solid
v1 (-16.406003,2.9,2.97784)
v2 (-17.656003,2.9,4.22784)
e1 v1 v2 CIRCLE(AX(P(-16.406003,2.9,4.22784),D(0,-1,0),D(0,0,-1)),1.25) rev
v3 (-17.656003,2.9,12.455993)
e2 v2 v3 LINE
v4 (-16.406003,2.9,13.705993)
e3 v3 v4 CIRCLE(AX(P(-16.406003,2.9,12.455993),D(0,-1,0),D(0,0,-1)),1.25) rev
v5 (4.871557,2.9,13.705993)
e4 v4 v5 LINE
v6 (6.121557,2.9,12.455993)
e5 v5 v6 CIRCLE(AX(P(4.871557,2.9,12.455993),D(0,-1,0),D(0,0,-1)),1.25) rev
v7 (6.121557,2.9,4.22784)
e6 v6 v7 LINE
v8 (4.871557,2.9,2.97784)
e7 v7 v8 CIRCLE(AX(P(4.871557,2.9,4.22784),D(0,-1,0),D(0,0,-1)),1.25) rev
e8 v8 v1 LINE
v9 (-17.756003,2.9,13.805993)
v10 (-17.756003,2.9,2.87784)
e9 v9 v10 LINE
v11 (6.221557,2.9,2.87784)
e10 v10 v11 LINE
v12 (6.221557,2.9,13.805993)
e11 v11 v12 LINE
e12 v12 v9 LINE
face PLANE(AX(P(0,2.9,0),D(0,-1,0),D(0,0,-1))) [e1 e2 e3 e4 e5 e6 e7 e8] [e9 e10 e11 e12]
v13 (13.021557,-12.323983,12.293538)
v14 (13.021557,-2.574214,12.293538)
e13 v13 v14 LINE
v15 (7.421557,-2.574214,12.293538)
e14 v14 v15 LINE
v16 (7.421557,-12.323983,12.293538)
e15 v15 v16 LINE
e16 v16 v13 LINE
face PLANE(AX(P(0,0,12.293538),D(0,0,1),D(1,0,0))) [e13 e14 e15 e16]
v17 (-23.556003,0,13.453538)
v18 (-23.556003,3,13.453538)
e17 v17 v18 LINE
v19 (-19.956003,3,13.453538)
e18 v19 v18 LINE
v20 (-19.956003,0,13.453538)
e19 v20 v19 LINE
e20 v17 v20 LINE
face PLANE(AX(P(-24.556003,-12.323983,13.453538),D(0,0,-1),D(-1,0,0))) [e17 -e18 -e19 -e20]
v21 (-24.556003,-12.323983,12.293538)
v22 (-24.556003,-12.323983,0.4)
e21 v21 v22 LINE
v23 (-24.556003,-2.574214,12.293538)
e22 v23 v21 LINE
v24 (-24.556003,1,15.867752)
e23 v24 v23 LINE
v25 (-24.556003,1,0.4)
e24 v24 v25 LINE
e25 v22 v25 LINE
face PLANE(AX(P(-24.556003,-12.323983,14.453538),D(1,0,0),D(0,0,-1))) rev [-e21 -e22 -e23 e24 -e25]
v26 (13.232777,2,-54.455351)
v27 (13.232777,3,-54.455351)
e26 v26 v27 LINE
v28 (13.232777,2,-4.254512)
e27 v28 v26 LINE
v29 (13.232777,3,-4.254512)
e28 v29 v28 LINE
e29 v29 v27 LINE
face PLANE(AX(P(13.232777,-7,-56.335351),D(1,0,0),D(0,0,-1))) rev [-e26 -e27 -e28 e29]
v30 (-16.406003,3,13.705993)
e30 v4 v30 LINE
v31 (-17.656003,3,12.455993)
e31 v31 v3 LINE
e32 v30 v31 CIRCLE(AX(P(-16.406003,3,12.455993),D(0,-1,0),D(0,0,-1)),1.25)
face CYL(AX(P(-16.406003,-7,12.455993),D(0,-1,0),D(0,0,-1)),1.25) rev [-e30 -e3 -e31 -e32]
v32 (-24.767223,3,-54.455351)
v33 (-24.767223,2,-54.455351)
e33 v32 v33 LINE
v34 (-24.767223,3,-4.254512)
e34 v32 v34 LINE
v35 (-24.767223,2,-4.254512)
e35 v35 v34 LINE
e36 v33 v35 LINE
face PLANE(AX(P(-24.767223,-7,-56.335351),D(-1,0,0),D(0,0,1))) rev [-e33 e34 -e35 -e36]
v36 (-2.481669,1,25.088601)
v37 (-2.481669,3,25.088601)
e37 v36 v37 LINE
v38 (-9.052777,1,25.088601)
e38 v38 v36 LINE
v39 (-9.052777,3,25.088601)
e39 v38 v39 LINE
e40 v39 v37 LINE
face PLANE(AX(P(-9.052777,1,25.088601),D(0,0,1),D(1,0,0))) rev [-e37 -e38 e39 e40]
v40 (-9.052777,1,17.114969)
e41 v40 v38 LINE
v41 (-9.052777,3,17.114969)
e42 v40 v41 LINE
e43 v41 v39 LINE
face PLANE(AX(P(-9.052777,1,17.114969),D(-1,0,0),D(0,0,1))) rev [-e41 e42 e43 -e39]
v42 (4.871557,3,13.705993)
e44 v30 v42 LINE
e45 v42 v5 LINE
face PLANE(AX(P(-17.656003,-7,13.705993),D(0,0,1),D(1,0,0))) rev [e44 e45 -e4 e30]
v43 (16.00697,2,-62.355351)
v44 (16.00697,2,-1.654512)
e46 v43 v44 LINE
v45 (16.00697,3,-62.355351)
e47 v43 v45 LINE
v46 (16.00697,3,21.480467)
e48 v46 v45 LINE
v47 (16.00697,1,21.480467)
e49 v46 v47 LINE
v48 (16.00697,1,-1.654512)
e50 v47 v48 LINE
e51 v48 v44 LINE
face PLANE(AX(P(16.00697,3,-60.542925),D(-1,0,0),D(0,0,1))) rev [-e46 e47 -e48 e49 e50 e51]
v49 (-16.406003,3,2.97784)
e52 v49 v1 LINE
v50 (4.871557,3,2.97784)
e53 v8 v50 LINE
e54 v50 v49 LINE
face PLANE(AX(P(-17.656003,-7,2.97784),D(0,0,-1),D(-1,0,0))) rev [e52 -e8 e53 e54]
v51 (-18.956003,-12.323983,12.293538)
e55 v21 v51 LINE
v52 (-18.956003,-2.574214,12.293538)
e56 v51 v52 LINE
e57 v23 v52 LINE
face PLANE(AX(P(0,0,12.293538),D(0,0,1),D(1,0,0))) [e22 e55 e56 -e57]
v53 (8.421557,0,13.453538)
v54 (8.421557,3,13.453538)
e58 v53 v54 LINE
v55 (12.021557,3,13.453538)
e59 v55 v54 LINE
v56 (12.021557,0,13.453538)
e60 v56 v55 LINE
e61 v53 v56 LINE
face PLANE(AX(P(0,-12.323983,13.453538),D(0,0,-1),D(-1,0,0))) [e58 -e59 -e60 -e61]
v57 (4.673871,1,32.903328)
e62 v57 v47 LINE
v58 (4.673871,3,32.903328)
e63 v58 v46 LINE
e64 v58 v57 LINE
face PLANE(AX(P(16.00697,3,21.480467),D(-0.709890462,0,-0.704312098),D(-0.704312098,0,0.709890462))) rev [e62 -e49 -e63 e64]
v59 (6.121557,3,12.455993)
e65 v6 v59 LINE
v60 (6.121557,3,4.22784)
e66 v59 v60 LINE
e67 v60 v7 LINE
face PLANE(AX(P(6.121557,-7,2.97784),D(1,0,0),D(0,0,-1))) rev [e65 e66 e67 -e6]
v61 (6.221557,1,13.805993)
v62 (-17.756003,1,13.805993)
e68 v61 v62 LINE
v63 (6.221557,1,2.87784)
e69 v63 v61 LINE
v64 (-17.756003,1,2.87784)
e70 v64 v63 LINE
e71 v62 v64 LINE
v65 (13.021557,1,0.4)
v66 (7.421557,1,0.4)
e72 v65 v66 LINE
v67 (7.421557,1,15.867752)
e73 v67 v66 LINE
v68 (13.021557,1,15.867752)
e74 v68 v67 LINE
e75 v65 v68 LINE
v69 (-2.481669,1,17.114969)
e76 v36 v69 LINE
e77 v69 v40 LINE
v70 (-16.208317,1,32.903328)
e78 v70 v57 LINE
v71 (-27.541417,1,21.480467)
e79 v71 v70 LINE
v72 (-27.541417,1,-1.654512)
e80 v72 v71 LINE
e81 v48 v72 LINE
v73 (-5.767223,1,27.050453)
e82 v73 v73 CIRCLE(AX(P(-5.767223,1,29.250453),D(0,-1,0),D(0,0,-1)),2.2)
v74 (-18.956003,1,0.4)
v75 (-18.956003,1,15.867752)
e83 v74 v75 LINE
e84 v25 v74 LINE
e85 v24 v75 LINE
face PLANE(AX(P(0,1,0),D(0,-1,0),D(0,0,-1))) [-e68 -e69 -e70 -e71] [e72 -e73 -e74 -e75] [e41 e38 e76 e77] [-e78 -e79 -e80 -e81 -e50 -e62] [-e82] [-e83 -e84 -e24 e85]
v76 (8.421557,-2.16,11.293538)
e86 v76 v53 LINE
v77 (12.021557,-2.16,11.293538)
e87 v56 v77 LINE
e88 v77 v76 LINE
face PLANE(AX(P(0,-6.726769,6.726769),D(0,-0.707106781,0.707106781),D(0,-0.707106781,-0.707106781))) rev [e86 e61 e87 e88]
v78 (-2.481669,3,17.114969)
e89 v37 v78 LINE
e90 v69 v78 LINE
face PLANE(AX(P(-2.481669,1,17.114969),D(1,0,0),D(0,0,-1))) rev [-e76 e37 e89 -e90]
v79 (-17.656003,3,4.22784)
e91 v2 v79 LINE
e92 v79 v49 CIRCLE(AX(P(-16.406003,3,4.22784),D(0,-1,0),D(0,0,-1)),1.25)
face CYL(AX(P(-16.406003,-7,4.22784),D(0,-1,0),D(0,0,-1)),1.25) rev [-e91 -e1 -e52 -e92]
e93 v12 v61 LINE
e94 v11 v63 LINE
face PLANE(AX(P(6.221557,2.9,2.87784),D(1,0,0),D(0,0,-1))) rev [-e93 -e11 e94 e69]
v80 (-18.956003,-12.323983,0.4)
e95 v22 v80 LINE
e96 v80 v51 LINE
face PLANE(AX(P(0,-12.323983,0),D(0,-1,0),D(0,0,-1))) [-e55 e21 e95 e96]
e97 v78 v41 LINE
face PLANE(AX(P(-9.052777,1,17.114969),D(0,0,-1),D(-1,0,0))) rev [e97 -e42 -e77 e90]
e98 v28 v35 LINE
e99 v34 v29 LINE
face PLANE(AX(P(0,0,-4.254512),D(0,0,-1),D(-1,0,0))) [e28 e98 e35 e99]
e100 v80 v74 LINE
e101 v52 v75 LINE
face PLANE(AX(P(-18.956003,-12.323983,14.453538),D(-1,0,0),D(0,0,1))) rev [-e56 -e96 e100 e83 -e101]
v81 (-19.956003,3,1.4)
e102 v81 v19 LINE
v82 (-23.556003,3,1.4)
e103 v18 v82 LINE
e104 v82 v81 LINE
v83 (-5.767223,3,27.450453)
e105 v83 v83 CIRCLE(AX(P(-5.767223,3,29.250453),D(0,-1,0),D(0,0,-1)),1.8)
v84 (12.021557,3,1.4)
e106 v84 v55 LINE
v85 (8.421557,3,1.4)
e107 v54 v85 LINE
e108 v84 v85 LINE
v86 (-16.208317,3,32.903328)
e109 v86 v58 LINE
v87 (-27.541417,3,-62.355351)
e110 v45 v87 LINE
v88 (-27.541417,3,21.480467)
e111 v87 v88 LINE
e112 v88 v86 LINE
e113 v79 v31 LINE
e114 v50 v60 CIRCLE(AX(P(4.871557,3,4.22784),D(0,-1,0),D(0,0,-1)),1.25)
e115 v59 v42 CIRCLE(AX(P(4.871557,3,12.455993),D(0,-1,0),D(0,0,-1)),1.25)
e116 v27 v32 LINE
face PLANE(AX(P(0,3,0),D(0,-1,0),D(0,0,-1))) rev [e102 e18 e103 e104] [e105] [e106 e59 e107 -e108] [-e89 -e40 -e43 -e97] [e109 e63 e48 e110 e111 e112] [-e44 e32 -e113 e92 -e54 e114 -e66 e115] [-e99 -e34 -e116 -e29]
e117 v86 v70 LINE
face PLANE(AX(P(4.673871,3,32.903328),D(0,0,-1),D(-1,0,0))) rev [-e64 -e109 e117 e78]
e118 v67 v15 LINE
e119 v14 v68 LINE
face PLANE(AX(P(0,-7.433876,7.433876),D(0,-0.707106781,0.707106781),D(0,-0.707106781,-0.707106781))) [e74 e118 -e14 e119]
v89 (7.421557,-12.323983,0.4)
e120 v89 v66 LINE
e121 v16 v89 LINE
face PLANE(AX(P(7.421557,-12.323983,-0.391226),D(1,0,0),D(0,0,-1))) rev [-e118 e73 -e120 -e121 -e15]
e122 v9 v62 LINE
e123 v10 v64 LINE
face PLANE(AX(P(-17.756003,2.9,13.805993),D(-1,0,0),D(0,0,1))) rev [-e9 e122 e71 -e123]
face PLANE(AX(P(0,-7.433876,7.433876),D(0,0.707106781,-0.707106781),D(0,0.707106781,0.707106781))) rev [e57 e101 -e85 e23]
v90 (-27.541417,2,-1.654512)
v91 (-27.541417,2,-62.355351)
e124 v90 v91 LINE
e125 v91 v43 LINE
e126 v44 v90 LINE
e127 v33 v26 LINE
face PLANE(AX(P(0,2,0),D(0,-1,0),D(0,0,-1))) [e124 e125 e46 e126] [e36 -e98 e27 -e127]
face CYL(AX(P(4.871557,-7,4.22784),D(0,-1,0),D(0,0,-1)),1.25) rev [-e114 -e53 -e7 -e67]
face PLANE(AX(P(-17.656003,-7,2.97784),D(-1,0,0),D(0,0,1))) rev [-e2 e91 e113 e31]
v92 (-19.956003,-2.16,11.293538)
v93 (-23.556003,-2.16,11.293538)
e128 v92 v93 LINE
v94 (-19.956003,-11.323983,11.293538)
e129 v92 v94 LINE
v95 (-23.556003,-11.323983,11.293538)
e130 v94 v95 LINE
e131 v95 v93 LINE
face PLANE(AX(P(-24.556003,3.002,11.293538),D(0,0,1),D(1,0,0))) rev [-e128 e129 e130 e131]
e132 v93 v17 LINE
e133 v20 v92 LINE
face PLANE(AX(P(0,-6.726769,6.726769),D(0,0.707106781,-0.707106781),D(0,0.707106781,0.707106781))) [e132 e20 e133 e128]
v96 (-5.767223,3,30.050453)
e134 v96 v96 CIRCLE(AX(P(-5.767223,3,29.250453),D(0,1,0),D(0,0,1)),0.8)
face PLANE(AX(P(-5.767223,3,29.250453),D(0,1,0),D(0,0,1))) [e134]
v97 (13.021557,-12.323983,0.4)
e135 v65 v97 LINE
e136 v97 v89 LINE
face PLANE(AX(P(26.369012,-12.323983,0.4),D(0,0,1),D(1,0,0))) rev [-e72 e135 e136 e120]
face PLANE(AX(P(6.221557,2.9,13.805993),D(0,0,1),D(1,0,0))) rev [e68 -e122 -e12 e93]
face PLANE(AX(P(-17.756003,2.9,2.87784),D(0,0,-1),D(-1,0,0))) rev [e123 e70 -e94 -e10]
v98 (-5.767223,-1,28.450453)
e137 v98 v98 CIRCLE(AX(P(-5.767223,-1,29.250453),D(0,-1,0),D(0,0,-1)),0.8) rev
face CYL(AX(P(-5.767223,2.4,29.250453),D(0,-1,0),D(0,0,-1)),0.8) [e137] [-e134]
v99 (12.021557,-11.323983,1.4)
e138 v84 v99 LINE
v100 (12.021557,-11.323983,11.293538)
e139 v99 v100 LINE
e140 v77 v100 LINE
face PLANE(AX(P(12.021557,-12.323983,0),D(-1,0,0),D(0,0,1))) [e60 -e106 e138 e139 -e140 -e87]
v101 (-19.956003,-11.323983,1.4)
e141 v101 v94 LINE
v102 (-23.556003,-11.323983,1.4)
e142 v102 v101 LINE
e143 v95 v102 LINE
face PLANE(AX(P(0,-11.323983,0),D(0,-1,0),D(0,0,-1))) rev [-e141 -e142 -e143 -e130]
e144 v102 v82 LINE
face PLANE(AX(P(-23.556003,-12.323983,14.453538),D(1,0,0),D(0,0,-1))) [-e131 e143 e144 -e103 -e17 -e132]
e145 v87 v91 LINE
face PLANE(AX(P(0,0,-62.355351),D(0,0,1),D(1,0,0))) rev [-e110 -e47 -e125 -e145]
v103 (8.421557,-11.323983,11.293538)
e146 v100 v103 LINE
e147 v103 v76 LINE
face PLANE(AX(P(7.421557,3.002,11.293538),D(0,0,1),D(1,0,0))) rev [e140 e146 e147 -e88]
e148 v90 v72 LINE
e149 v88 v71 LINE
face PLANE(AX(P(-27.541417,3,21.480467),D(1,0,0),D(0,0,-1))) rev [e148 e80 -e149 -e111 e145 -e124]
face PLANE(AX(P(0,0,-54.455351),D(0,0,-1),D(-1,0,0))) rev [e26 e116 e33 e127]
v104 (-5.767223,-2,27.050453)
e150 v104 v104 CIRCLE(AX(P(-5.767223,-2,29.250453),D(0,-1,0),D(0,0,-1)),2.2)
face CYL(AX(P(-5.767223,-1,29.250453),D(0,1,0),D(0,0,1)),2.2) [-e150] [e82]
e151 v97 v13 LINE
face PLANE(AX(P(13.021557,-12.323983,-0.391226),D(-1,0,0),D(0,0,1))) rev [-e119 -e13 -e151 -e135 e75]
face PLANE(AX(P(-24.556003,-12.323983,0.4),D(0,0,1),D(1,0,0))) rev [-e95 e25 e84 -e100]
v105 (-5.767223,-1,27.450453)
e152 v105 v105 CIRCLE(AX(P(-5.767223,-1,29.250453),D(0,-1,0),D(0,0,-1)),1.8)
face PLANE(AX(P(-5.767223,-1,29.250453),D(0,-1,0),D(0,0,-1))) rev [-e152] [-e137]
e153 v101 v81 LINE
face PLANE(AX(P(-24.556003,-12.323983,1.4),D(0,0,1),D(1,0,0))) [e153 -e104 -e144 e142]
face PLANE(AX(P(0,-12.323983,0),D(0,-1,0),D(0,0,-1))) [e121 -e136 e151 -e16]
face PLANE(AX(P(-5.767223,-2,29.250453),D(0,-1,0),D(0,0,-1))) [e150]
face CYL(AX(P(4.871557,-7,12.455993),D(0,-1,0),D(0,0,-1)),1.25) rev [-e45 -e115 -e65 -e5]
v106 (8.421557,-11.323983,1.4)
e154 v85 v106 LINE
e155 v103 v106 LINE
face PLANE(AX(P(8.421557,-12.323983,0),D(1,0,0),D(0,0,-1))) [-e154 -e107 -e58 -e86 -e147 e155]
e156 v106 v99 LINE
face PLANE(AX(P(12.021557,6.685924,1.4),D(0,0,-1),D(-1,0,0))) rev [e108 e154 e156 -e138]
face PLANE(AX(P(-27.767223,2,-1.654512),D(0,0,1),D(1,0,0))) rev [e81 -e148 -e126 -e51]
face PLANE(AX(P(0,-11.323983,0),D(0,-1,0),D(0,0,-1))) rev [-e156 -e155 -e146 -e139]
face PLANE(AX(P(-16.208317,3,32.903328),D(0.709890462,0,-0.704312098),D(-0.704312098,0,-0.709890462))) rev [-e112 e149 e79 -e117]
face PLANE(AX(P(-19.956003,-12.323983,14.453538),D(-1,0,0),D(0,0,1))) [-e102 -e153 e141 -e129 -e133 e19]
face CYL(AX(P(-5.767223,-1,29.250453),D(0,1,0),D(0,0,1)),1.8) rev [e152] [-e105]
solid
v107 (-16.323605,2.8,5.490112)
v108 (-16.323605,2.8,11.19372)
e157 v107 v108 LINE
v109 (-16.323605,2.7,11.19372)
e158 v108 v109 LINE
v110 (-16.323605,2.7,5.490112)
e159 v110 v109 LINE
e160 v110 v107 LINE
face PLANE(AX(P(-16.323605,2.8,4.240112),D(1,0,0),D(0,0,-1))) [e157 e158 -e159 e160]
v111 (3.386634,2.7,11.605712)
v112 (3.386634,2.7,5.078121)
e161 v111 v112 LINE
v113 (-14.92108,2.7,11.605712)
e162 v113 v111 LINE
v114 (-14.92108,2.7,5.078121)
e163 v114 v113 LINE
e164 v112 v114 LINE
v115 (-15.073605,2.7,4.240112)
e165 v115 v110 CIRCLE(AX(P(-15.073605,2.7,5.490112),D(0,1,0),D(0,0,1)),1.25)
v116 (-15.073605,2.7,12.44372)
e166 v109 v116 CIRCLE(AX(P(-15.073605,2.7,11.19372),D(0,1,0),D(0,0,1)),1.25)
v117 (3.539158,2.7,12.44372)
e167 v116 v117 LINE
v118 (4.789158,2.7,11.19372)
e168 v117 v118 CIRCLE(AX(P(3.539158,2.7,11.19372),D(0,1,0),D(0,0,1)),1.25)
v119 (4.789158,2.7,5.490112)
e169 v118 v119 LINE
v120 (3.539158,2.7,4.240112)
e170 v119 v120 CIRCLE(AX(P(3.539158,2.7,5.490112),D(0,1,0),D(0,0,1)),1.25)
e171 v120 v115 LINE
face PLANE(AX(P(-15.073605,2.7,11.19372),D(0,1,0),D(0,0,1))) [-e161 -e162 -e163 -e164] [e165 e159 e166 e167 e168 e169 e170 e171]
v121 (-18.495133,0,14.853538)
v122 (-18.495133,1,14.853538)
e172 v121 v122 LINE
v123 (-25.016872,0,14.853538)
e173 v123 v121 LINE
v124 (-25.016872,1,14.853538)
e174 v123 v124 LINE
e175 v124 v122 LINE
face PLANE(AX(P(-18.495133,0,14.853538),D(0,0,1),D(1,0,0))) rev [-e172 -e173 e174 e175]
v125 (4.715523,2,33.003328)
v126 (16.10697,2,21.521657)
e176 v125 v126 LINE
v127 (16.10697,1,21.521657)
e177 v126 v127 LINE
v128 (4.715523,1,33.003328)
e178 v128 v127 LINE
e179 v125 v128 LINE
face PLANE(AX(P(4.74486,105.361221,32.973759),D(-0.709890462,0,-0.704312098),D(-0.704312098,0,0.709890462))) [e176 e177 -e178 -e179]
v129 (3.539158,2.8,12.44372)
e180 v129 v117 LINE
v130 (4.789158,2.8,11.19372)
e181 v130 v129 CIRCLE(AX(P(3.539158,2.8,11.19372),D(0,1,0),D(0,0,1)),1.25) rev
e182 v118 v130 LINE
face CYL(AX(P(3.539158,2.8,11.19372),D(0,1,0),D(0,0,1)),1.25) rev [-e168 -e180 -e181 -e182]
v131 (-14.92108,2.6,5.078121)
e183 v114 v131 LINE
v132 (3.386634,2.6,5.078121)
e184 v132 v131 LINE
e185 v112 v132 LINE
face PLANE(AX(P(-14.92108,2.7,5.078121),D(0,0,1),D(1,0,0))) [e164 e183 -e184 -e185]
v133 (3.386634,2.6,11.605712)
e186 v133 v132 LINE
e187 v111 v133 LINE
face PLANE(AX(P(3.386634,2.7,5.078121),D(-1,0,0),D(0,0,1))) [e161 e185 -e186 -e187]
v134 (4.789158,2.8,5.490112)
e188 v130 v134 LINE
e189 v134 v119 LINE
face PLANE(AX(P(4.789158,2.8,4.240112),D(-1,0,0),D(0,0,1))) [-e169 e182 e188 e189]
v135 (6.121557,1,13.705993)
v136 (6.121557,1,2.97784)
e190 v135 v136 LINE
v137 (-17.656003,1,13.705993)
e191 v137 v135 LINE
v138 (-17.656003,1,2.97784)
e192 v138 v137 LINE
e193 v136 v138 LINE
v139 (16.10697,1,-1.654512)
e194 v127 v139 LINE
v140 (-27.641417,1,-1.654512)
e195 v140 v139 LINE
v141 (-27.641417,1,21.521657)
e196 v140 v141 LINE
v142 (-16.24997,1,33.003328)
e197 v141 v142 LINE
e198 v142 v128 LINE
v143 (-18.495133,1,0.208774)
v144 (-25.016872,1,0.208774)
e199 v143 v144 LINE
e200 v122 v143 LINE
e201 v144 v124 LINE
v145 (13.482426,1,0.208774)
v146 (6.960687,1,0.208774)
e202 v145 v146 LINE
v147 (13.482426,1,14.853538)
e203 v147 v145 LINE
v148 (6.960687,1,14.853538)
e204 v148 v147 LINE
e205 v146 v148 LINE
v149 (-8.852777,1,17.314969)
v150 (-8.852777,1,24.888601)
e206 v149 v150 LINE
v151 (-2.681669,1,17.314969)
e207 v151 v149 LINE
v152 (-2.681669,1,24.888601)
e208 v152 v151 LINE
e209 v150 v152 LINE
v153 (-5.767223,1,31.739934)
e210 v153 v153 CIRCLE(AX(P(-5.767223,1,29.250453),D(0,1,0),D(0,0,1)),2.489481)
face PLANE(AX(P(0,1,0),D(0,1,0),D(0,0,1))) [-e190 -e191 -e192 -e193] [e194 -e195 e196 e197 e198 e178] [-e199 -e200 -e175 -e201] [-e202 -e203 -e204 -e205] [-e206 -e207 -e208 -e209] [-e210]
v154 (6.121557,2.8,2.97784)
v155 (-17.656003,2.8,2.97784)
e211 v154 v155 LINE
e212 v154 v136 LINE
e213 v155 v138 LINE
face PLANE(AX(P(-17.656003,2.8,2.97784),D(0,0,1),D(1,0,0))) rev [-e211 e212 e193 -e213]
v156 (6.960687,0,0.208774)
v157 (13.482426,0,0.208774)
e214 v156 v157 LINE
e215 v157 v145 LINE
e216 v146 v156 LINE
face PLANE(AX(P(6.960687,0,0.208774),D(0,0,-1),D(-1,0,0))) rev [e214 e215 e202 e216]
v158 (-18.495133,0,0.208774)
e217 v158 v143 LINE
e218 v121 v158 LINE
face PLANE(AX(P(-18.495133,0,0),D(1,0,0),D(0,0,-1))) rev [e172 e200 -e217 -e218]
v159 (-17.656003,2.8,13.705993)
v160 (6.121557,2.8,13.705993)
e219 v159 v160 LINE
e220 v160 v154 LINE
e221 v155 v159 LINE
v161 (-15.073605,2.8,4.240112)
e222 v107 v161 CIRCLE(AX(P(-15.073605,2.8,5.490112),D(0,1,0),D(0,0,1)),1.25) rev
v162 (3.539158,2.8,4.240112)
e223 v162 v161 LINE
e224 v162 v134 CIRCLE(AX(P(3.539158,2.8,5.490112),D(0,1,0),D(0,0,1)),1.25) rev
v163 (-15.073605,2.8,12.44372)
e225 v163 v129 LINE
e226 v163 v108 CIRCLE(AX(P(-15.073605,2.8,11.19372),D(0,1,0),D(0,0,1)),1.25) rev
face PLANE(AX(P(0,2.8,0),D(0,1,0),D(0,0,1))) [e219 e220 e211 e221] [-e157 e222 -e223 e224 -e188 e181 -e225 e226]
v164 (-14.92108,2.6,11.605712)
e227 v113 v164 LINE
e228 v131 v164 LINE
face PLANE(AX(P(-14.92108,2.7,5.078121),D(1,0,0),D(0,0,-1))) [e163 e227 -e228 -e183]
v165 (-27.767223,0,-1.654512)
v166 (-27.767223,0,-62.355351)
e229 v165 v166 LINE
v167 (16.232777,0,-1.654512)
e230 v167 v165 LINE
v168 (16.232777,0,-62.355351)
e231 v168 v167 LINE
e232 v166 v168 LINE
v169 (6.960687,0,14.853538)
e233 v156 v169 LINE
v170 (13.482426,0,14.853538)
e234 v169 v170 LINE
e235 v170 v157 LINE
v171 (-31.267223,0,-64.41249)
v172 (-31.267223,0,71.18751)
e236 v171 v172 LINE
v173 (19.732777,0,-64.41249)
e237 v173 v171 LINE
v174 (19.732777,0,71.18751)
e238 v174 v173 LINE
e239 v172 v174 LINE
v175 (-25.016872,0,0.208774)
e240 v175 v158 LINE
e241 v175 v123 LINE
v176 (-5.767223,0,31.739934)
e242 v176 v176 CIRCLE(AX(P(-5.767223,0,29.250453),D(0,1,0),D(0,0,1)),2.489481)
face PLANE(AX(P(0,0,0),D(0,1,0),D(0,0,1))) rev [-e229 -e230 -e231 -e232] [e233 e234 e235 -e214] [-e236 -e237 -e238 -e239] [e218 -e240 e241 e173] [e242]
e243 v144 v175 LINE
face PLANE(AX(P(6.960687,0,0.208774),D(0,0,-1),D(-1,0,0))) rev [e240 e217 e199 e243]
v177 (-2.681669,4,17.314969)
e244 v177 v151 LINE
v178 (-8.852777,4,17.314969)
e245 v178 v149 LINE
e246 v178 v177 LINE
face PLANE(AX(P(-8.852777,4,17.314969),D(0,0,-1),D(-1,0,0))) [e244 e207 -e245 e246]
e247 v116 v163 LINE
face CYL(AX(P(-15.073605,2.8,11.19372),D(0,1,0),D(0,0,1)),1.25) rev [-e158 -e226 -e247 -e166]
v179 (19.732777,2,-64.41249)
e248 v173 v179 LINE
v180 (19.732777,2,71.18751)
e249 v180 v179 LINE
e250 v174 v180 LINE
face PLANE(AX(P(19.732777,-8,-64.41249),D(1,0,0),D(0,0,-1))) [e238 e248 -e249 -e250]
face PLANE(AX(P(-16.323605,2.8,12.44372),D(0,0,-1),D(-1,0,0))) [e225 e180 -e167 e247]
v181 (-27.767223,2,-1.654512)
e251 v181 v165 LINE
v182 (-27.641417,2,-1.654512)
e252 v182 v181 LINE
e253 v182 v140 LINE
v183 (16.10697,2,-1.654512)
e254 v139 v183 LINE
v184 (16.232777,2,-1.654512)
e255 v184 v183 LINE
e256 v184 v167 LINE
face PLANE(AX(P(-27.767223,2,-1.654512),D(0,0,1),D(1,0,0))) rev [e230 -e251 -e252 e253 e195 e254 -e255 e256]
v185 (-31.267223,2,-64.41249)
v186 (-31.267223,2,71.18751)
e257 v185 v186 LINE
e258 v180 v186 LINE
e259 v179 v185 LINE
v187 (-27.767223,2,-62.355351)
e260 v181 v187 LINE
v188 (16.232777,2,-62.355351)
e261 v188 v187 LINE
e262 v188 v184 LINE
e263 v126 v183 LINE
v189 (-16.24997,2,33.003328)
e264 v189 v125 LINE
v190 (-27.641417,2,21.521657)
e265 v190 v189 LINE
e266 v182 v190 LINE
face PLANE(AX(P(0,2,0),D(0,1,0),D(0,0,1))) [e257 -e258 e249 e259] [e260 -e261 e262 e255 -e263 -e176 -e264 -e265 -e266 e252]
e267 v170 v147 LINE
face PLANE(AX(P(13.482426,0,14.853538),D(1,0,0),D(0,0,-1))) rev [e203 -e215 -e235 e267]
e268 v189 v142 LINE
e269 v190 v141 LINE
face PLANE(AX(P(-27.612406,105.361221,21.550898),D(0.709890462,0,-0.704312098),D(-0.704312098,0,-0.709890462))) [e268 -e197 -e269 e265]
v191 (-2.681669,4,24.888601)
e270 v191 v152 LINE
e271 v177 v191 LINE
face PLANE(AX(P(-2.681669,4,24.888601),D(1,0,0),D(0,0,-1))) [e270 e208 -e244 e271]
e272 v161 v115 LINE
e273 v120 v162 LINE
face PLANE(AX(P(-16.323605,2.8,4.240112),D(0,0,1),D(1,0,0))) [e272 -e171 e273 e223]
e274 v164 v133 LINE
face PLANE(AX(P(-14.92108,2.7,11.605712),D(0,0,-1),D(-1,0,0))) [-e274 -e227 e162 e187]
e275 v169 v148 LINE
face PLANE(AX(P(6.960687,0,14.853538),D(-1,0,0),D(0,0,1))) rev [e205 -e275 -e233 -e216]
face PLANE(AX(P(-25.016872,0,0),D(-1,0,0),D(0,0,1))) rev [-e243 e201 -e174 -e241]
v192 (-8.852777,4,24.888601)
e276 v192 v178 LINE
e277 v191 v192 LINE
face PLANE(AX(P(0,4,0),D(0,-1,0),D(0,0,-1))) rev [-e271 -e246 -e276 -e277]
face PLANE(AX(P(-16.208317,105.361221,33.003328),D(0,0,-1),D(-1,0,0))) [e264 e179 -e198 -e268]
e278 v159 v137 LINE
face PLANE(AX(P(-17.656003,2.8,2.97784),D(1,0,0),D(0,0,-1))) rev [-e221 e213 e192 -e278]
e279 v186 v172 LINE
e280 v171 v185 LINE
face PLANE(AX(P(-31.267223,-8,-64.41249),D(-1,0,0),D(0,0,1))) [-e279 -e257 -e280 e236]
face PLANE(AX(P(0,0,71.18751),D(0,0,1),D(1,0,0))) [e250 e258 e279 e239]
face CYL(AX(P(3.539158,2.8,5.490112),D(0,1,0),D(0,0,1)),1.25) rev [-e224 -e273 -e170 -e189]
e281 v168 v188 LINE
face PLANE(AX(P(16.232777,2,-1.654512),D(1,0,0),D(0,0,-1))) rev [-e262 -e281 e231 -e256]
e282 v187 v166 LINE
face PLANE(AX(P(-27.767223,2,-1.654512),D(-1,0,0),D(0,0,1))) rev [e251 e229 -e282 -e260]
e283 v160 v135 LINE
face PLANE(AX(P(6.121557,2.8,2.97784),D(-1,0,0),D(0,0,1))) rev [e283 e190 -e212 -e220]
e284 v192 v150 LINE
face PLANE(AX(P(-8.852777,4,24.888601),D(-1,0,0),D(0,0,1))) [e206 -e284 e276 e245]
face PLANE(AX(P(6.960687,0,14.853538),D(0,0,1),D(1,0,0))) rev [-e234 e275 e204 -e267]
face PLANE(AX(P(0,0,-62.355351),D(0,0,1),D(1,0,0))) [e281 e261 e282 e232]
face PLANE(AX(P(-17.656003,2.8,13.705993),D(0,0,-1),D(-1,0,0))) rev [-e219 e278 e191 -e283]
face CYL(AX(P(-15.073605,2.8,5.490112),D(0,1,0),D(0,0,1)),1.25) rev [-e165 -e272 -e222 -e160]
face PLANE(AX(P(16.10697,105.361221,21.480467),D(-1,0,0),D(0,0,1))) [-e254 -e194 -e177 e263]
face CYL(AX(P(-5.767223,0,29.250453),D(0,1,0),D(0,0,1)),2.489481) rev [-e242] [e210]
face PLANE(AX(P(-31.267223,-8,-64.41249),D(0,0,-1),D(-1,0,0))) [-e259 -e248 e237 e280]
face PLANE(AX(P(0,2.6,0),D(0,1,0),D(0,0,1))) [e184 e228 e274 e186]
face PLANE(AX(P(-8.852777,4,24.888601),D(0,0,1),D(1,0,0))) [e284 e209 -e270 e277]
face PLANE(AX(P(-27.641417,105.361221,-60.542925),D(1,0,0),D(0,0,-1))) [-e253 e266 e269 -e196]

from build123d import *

# Parameters (mm, degrees)
SKETCH1_W                   = 51.332398317
SKETCH1_H                   = 136.325385694
BOSS_EXTRUDE1_DEPTH         = 2
CUT_EXTRUDE1_DEPTH          = 1
SKETCH3_W                   = 26.718092566
SKETCH3_H                   = 51.160838605
CUT_EXTRUDE2_DEPTH          = 1
SKETCH4_W                   = 20.659186536
SKETCH4_H                   = 13.604488078
BOSS_EXTRUDE2_DEPTH         = 1
SKETCH5_W                   = 6.521739131
SKETCH5_H                   = 14.853538096
SKETCH5_W_2                 = 6.52173913
SKETCH5_H_2                 = 15.644764374
CUT_EXTRUDE3_DEPTH          = 1
SKETCH6_W                   = 6.171107994
SKETCH6_H                   = 7.573632539
CUT_EXTRUDE4_DEPTH          = 1
SKETCH7_R                   = 2.489481066
CUT_EXTRUDE5_DEPTH          = 1
BOSS_EXTRUDE3_DEPTH         = 1
SKETCH10_W                  = 6.171107994
SKETCH10_H                  = 7.573632539
BOSS_EXTRUDE4_DEPTH         = 4
BOSS_EXTRUDE5_DEPTH         = 2
SKETCH12_W                  = 6.571107994
SKETCH12_H                  = 7.973632539
CUT_EXTRUDE6_DEPTH          = 2
SKETCH13_R                  = 1.8
SKETCH13_W                  = 26.718092566
SKETCH13_H                  = 51.160838605
CUT_EXTRUDE9_DEPTH          = 2
SKETCH14_R                  = 2.2
SKETCH14_R_2                = 1.8
BOSS_EXTRUDE11_DEPTH        = 2
SKETCH17_R                  = 2.2
BOSS_EXTRUDE12_DEPTH        = 1
SKETCH18_R                  = 0.8
BOSS_EXTRUDE15_DEPTH        = 3.4
EXTRUDE_THIN3_OUTLINE_W     = 5.6
EXTRUDE_THIN3_OUTLINE_H     = 14.844764374
EXTRUDE_THIN3_OUTLINE_W_2   = 3.6
EXTRUDE_THIN3_OUTLINE_H_2   = 12.844764374
EXTRUDE_THIN3_DEPTH         = 13.32398317
EXTRUDE_THIN3_2_OUTLINE_W   = 5.6
EXTRUDE_THIN3_2_OUTLINE_H   = 14.053538096
EXTRUDE_THIN3_2_OUTLINE_W_2 = 3.6
EXTRUDE_THIN3_2_OUTLINE_H_2 = 12.053538096
EXTRUDE_THIN3_2_DEPTH       = 13.32398317
SKETCH26_W                  = 3.6
SKETCH26_H                  = 12.053538096
SKETCH26_H_2                = 12.844764374
CUT_EXTRUDE12_DEPTH         = 13.32398317
SKETCH27_W                  = 5.6
SKETCH27_H                  = 14.053538096
BOSS_EXTRUDE18_DEPTH        = 1
SKETCH27_W_2                = 5.570395019
SKETCH27_H_2                = 14.844764374
BOSS_EXTRUDE18_2_DEPTH      = 1
SKETCH28_W                  = 20.659186536
SKETCH28_H                  = 13.604488078
CUT_EXTRUDE13_DEPTH         = 1
SKETCH29_W                  = 23.777559608
SKETCH29_H                  = 10.728152402
CUT_EXTRUDE15_DEPTH         = 10
SKETCH30_W                  = 23.777559608
SKETCH30_H                  = 10.728152402
SKETCH30_W_2                = 21.112762974
SKETCH30_H_2                = 8.203608222
BOSS_EXTRUDE20_DEPTH        = 1.8
SKETCH31_W                  = 21.112762974
SKETCH31_H                  = 8.203608222
BOSS_EXTRUDE21_DEPTH        = 1.6
SKETCH35_W                  = 23.977559608
SKETCH35_H                  = 10.928152402
CUT_EXTRUDE21_DEPTH         = 1.9
FILLET2_R                   = 1.25
FILLET3_R                   = 1.25
SKETCH37_W                  = 18.307713885
SKETCH37_H                  = 6.527591392
CUT_EXTRUDE22_DEPTH         = 0.1
SKETCH41_W                  = 18.307713885
SKETCH41_H                  = 6.527591392
BOSS_EXTRUDE27_DEPTH        = 0.1
SKETCH43_W                  = 18.307713885
SKETCH43_H                  = 6.527591392
BOSS_EXTRUDE28_DEPTH        = 0.1
CUT_EXTRUDE24_DEPTH         = 40.1
SKETCH51_W                  = 5.6
SKETCH51_H                  = 4.468914857
BOSS_EXTRUDE29_DEPTH        = 1
BOSS_EXTRUDE29_2_DEPTH      = 1
SKETCH52_W                  = 5.6
SKETCH52_H                  = 1
BOSS_EXTRUDE30_DEPTH        = 2.5
BOSS_EXTRUDE30_2_DEPTH      = 2.5
SKETCH53_W                  = 5.6
SKETCH53_H                  = 1
BOSS_EXTRUDE31_DEPTH        = 1
BOSS_EXTRUDE32_START        = 7.421556697
BOSS_EXTRUDE32_DEPTH        = 5.6
BOSS_EXTRUDE32_START_2      = -24.556002911
BOSS_EXTRUDE32_2_DEPTH      = 5.6
SKETCH55_W                  = 3.6
SKETCH55_H                  = 0.791226278
BOSS_EXTRUDE33_DEPTH        = 14.323983
SKETCH56_W                  = 0.791226278
SKETCH56_H                  = 13.32398317
CUT_EXTRUDE25_DEPTH         = 5.6
CUT_EXTRUDE_THIN1_DEPTH     = 1
SKETCH59_W                  = 71.33
SKETCH59_H                  = 156.33
SKETCH59_W_2                = 51.33
SKETCH59_H_2                = 136.33
CUT_EXTRUDE_THIN2_DEPTH     = 10
SKETCH60_W                  = 71
SKETCH60_H                  = 156
SKETCH60_W_2                = 51
SKETCH60_H_2                = 136
CUT_EXTRUDE_THIN3_DEPTH     = 10
SKETCH61_W                  = 51
SKETCH61_H                  = 2
CUT_EXTRUDE26_DEPTH         = 0.4
SKETCH62_W                  = 38
SKETCH62_H                  = 51.160838605
CUT_EXTRUDE28_DEPTH         = 10
SKETCH64_W                  = 38
SKETCH64_H                  = 0.08
BOSS_EXTRUDE35_DEPTH        = 2
SKETCH65_W                  = 38
SKETCH65_H                  = 0.08
BOSS_EXTRUDE37_DEPTH        = 1
SKETCH67_W                  = 44
SKETCH67_H                  = 61.400838605
CUT_EXTRUDE31_DEPTH         = 2
SKETCH69_W                  = 40.716981818
SKETCH69_H                  = 1
BOSS_EXTRUDE39_DEPTH        = 1.863286117
SKETCH70_W                  = 44
SKETCH70_H                  = 2
BOSS_EXTRUDE40_DEPTH        = 1
SKETCH71_W                  = 38
SKETCH71_H                  = 1
CUT_EXTRUDE32_DEPTH         = 1
SKETCH72_W                  = 38
SKETCH72_H                  = 1
BOSS_EXTRUDE41_DEPTH        = 1.8
SKETCH73_W                  = 44
SKETCH73_H                  = 2
CUT_EXTRUDE33_DEPTH         = 0.3
SKETCH74_W                  = 43.548387097
SKETCH74_H                  = 1
BOSS_EXTRUDE43_DEPTH        = 1.812426367
SKETCH75_R                  = 0.8
BOSS_EXTRUDE44_DEPTH        = 0.6


with BuildPart() as part:
    # Sketch1 → Boss-Extrude1 (new body)
    with BuildSketch(Plane(origin=(0, 0, 0), x_dir=(1, 0, 0), z_dir=(0, 1, 0))):
        with Locations((-5.767223106, -3.58751015)):
            Rectangle(SKETCH1_W, SKETCH1_H)
    extrude(amount=BOSS_EXTRUDE1_DEPTH)

    # Sketch2 → Cut-Extrude1 (cut)
    with BuildSketch(Plane(origin=(0, 2, 0), x_dir=(1, 0, 0), z_dir=(0, 1, 0))):
        Polygon((-27.541416655, -30.445855171), (-27.541416655, 60.542924633), (16.006970442, 60.542924633), (16.006970442, -30.445855171), (4.678976052, -41.666051524), (-16.213422265, -41.666051524), align=None)
    extrude(amount=-CUT_EXTRUDE1_DEPTH, mode=Mode.SUBTRACT)

    # Sketch3 → Cut-Extrude2 (cut)
    with BuildSketch(Plane(origin=(0, 1, 0), x_dir=(1, 0, 0), z_dir=(0, 1, 0))):
        with Locations((-5.767223107, 30.754931698)):
            Rectangle(SKETCH3_W, SKETCH3_H)
    extrude(amount=-CUT_EXTRUDE2_DEPTH, mode=Mode.SUBTRACT)

    # Sketch4 → Boss-Extrude2 (add)
    with BuildSketch(Plane(origin=(0, 1, 0), x_dir=(1, 0, 0), z_dir=(0, 1, 0))):
        with Locations((-5.767223107, -7.988180452)):
            Rectangle(SKETCH4_W, SKETCH4_H)
    extrude(amount=BOSS_EXTRUDE2_DEPTH)

    # Sketch5 → Cut-Extrude3 (cut)
    with BuildSketch(Plane(origin=(0, 1, 0), x_dir=(1, 0, 0), z_dir=(0, 1, 0))):
        with Locations((-21.756002911, -7.426769048)):
            Rectangle(SKETCH5_W, SKETCH5_H)
        with Locations((10.221556697, -7.031155909)):
            Rectangle(SKETCH5_W_2, SKETCH5_H_2)
    extrude(amount=-CUT_EXTRUDE3_DEPTH, mode=Mode.SUBTRACT)

    # Sketch6 → Cut-Extrude4 (cut)
    with BuildSketch(Plane(origin=(0, 1, 0), x_dir=(1, 0, 0), z_dir=(0, 1, 0))):
        with Locations((-5.767223107, -21.101784941)):
            Rectangle(SKETCH6_W, SKETCH6_H)
    extrude(amount=-CUT_EXTRUDE4_DEPTH, mode=Mode.SUBTRACT)

    # Sketch7 → Cut-Extrude5 (cut)
    with BuildSketch(Plane(origin=(0, 1, 0), x_dir=(1, 0, 0), z_dir=(0, 1, 0))):
        with Locations(Location((-5.767223107, -29.250452542, 0), (0, 0, 270))):
            Circle(SKETCH7_R)
    extrude(amount=-CUT_EXTRUDE5_DEPTH, mode=Mode.SUBTRACT)

    # Sketch8 → Boss-Extrude3 (add)
    with BuildSketch(Plane(origin=(0, 1, 0), x_dir=(1, 0, 0), z_dir=(0, 1, 0))):
        Polygon((-27.541416655, -21.480466567), (-27.541416655, -30.445855171), (-16.213422265, -41.666051524), (4.678976052, -41.666051524), (16.006970442, -30.445855171), (16.006970442, -21.480466567), (4.673870862, -32.903327717), (-16.208317076, -32.903327717), align=None)
    extrude(amount=BOSS_EXTRUDE3_DEPTH)

    # Sketch10 → Boss-Extrude4 (add)
    with BuildSketch(Plane.XZ):
        with Locations((-5.767223107, 21.101784941)):
            Rectangle(SKETCH10_W, SKETCH10_H)
    extrude(amount=-BOSS_EXTRUDE4_DEPTH)

    # Sketch28 → Cut-Extrude13 (cut)
    with BuildSketch(Plane(origin=(0, 2, 0), x_dir=(1, 0, 0), z_dir=(0, 1, 0))):
        with Locations((-5.767223107, -7.988180452)):
            Rectangle(SKETCH28_W, SKETCH28_H)
    extrude(amount=-CUT_EXTRUDE13_DEPTH, mode=Mode.SUBTRACT)


with BuildPart() as body_2:
    # Sketch11 → Boss-Extrude5 (new body)
    with BuildSketch(Plane(origin=(0, 1, 0), x_dir=(1, 0, 0), z_dir=(0, 1, 0))):
        Polygon((-27.541416655, 60.542924633), (16.006970442, 60.542924633), (16.006970442, -21.480466567), (4.673870862, -32.903327717), (-16.208317076, -32.903327717), (-27.541416655, -21.480466567), align=None)
    extrude(amount=BOSS_EXTRUDE5_DEPTH)

    # Sketch12 → Cut-Extrude6 (cut)
    with BuildSketch(Plane(origin=(0, 3, 0), x_dir=(1, 0, 0), z_dir=(0, 1, 0))):
        with Locations((-5.767223107, -21.10178494)):
            Rectangle(SKETCH12_W, SKETCH12_H)
    extrude(amount=-CUT_EXTRUDE6_DEPTH, mode=Mode.SUBTRACT)

    # Sketch13 → Cut-Extrude9 (cut)
    with BuildSketch(Plane.XZ.offset(-1)):
        with Locations(Location((-5.767223107, 29.250452542, 0), (0, 0, 270))):
            Circle(SKETCH13_R)
        with Locations((-5.767223107, -30.754931698)):
            Rectangle(SKETCH13_W, SKETCH13_H)
    extrude(amount=-CUT_EXTRUDE9_DEPTH, mode=Mode.SUBTRACT)


with BuildPart() as body_3:
    # Sketch14 → Boss-Extrude11 (new body)
    with BuildSketch(Plane.XZ.offset(-1)):
        with Locations(Location((-5.767223107, 29.250452542, 0), (0, 0, 270))):
            Circle(SKETCH14_R)
        with Locations(Location((-5.767223107, 29.250452542, 0), (0, 0, 270))):
            Circle(SKETCH14_R_2, mode=Mode.SUBTRACT)
    extrude(amount=BOSS_EXTRUDE11_DEPTH)

    # Combine1: union body 2
    add(body_2.part)

    # Sketch17 → Boss-Extrude12 (add)
    with BuildSketch(Plane.XZ.offset(1)):
        with Locations(Location((-5.767223107, 29.250452542, 0), (0, 0, 270))):
            Circle(SKETCH17_R)
    extrude(amount=BOSS_EXTRUDE12_DEPTH)


with BuildPart() as body_3_2:
    # Sketch18 → Boss-Extrude15 (new body)
    with BuildSketch(Plane(origin=(0, -1, 0), x_dir=(1, 0, 0), z_dir=(0, 1, 0))):
        with Locations(Location((-5.767223107, -29.250452542, 0), (0, 0, 270))):
            Circle(SKETCH18_R)
    extrude(amount=BOSS_EXTRUDE15_DEPTH)


with BuildPart() as body_3_1:
    add(body_3.part)

    # Combine3: union body 3 2
    add(body_3_2.part)

    # Sketch26 → Cut-Extrude12 (cut)
    with BuildSketch(Plane.XZ.offset(-1)):
        with Locations((-21.756002911, 7.426769048)):
            Rectangle(SKETCH26_W, SKETCH26_H)
        with Locations((10.221556697, 7.031155909)):
            Rectangle(SKETCH26_W, SKETCH26_H_2)
    extrude(amount=-CUT_EXTRUDE12_DEPTH, mode=Mode.SUBTRACT)


with BuildPart() as body_3_3:
    # Extrude-Thin3: read off the stored shape, not the designer's step
    # Extrude-Thin3 outline → Extrude-Thin3 (new body)
    with BuildSketch(Plane.XZ.offset(-1)):
        with Locations((10.221556697, 7.031155909)):
            Rectangle(EXTRUDE_THIN3_OUTLINE_W, EXTRUDE_THIN3_OUTLINE_H)
        with Locations((10.221556697, 7.031155909)):
            Rectangle(EXTRUDE_THIN3_OUTLINE_W_2, EXTRUDE_THIN3_OUTLINE_H_2, mode=Mode.SUBTRACT)
    extrude(amount=EXTRUDE_THIN3_DEPTH)


with BuildPart() as body_4:
    # Extrude-Thin3 2 outline → Extrude-Thin3 2 (new body)
    with BuildSketch(Plane.XZ.offset(-1)):
        with Locations((-21.756002911, 7.426769048)):
            Rectangle(EXTRUDE_THIN3_2_OUTLINE_W, EXTRUDE_THIN3_2_OUTLINE_H)
        with Locations((-21.756002911, 7.426769048)):
            Rectangle(EXTRUDE_THIN3_2_OUTLINE_W_2, EXTRUDE_THIN3_2_OUTLINE_H_2, mode=Mode.SUBTRACT)
    extrude(amount=EXTRUDE_THIN3_2_DEPTH)


with BuildPart() as body_5:
    # Sketch27 → Boss-Extrude18 (new body)
    with BuildSketch(Plane.XZ.offset(12.32398317)):
        with Locations((-21.756002911, 7.426769048)):
            Rectangle(SKETCH27_W, SKETCH27_H)
    extrude(amount=-BOSS_EXTRUDE18_DEPTH)


with BuildPart() as body_6:
    # Sketch27 → Boss-Extrude18 2 (new body)
    with BuildSketch(Plane.XZ.offset(12.32398317)):
        with Locations((10.206754207, 7.031155909)):
            Rectangle(SKETCH27_W_2, SKETCH27_H_2)
    extrude(amount=-BOSS_EXTRUDE18_2_DEPTH)


with BuildPart() as body_4_1:
    add(body_4.part)

    # Combine4: union body 3 3, body 3, body 5, body 6
    add(body_3_3.part)
    add(body_3_1.part)
    add(body_5.part)
    add(body_6.part)

    # Sketch29 → Cut-Extrude15 (cut)
    with BuildSketch(Plane(origin=(0, 3, 0), x_dir=(1, 0, 0), z_dir=(0, 1, 0))):
        with Locations((-5.767223107, -8.341916313)):
            Rectangle(SKETCH29_W, SKETCH29_H)
    extrude(amount=-CUT_EXTRUDE15_DEPTH, mode=Mode.SUBTRACT)

    # Sketch35 → Cut-Extrude21 (cut)
    with BuildSketch(Plane.XZ.offset(-1)):
        with Locations((-5.767223107, 8.341916313)):
            Rectangle(SKETCH35_W, SKETCH35_H)
    extrude(amount=-CUT_EXTRUDE21_DEPTH, mode=Mode.SUBTRACT)

    # Fillet2
    fillet2_edges = [body_4_1.edges().sort_by_distance(p)[0] for p in [
        (-17.656002911, 2.95, 13.705992514),
        (6.121556697, 2.95, 13.705992514),
        (6.121556697, 2.95, 2.977840112),
        (-17.656002911, 2.95, 2.977840112),
    ]]
    fillet(fillet2_edges, radius=FILLET2_R)

    # Sketch50 → Cut-Extrude24 (cut)
    with BuildSketch(Plane(origin=(13.021556697, 0, 0), x_dir=(0, 0, -1), z_dir=(1, 0, 0))):
        Polygon((-14.453538096, 1), (-11.293538096, -2.16), (-11.293538096, -12.32398317), (-14.453538096, -12.32398317), align=None)
    extrude(amount=-CUT_EXTRUDE24_DEPTH, mode=Mode.SUBTRACT)


with BuildPart() as body_3_4:
    # Sketch30 → Boss-Extrude20 (new body)
    with BuildSketch(Plane(origin=(0, 1, 0), x_dir=(1, 0, 0), z_dir=(0, 1, 0))):
        with Locations((-5.767223107, -8.341916313)):
            Rectangle(SKETCH30_W, SKETCH30_H)
        with Locations((-5.767223107, -8.341916313)):
            Rectangle(SKETCH30_W_2, SKETCH30_H_2, mode=Mode.SUBTRACT)
    extrude(amount=BOSS_EXTRUDE20_DEPTH)


with BuildPart() as body_4_2:
    # Sketch31 → Boss-Extrude21 (new body)
    with BuildSketch(Plane(origin=(0, 1, 0), x_dir=(1, 0, 0), z_dir=(0, 1, 0))):
        with Locations((-5.767223107, -8.341916313)):
            Rectangle(SKETCH31_W, SKETCH31_H)
    extrude(amount=BOSS_EXTRUDE21_DEPTH)


with BuildPart() as part_1:
    add(part.part)

    # Combine5: union body 3 4, body 4 2
    add(body_3_4.part)
    add(body_4_2.part)

    # Fillet3
    fillet3_edges = [part_1.edges().sort_by_distance(p)[0] for p in [
        (-16.323604594, 2.7, 12.443720424),
        (4.78915838, 2.7, 12.443720424),
        (4.78915838, 2.7, 4.240112202),
        (-16.323604594, 2.7, 4.240112202),
    ]]
    fillet(fillet3_edges, radius=FILLET3_R)

    # Sketch37 → Cut-Extrude22 (cut)
    with BuildSketch(Plane(origin=(0, 2.6, 0), x_dir=(1, 0, 0), z_dir=(0, 1, 0))):
        with Locations((-5.767223107, -8.341916313)):
            Rectangle(SKETCH37_W, SKETCH37_H)
    extrude(amount=-CUT_EXTRUDE22_DEPTH, mode=Mode.SUBTRACT)


with BuildPart() as body_3_5:
    # Sketch41 → Boss-Extrude27 (new body)
    with BuildSketch(Plane(origin=(0, 2.6, 0), x_dir=(1, 0, 0), z_dir=(0, 1, 0))):
        with BuildLine():
            Line((-15.073604594, -12.443720424), (3.53915838, -12.443720424))
            ThreePointArc((3.53915838, -12.443720424), (4.423041856, -12.077603901), (4.78915838, -11.193720424))
            Line((4.78915838, -11.193720424), (4.78915838, -5.490112202))
            ThreePointArc((4.78915838, -5.490112202), (4.423041856, -4.606228725), (3.53915838, -4.240112202))
            Line((3.53915838, -4.240112202), (-15.073604594, -4.240112202))
            ThreePointArc((-15.073604594, -4.240112202), (-15.95748807, -4.606228725), (-16.323604594, -5.490112202))
            Line((-16.323604594, -5.490112202), (-16.323604594, -11.193720424))
            ThreePointArc((-16.323604594, -11.193720424), (-15.95748807, -12.077603901), (-15.073604594, -12.443720424))
        make_face()
        with Locations((-5.767223107, -8.341916313)):
            Rectangle(SKETCH41_W, SKETCH41_H, mode=Mode.SUBTRACT)
    extrude(amount=BOSS_EXTRUDE27_DEPTH)

    # Combine6: union part
    add(part_1.part)


with BuildPart() as body_3_6:
    # Sketch43 → Boss-Extrude28 (new body)
    with BuildSketch(Plane(origin=(0, 2.5, 0), x_dir=(1, 0, 0), z_dir=(0, 1, 0))):
        with Locations((-5.767223107, -8.341916313)):
            Rectangle(SKETCH43_W, SKETCH43_H)
    extrude(amount=BOSS_EXTRUDE28_DEPTH)

    # Combine7: union body 3 5
    add(body_3_5.part)

    # Sketch58 → Cut-Extrude-Thin1 (cut)
    with BuildSketch(Plane(origin=(0, 1, 0), x_dir=(1, 0, 0), z_dir=(0, 1, 0))):
        Polygon((-16.249969686, -33.003327717), (4.715523472, -33.003327717), (16.106970442, -21.521657048), (16.106970442, 60.642924633), (-27.641416655, 60.642924633), (-27.641416655, -21.521657048), align=None)
        Polygon((-16.208317076, -32.903327717), (4.673870862, -32.903327717), (16.006970442, -21.480466567), (16.006970442, 60.542924633), (-27.541416655, 60.542924633), (-27.541416655, -21.480466567), align=None, mode=Mode.SUBTRACT)
    extrude(amount=CUT_EXTRUDE_THIN1_DEPTH, mode=Mode.SUBTRACT)

    # Sketch59 → Cut-Extrude-Thin2 (cut)
    with BuildSketch(Plane(origin=(0, 2, 0), x_dir=(1, 0, 0), z_dir=(0, 1, 0))):
        with Locations((-5.767223107, -3.58751015)):
            Rectangle(SKETCH59_W, SKETCH59_H)
        with Locations((-5.767223107, -3.58751015)):
            Rectangle(SKETCH59_W_2, SKETCH59_H_2, mode=Mode.SUBTRACT)
    extrude(amount=-CUT_EXTRUDE_THIN2_DEPTH, mode=Mode.SUBTRACT)

    # Sketch60 → Cut-Extrude-Thin3 (cut)
    with BuildSketch(Plane(origin=(0, 2, 0), x_dir=(1, 0, 0), z_dir=(0, 1, 0))):
        with Locations((-5.767223107, -3.58751015)):
            Rectangle(SKETCH60_W, SKETCH60_H)
        with Locations((-5.767223107, -3.58751015)):
            Rectangle(SKETCH60_W_2, SKETCH60_H_2, mode=Mode.SUBTRACT)
    extrude(amount=-CUT_EXTRUDE_THIN3_DEPTH, mode=Mode.SUBTRACT)

    # Sketch61 → Cut-Extrude26 (cut)
    with BuildSketch(Plane.XY.offset(71.58751015)):
        with Locations((-5.767223107, 1)):
            Rectangle(SKETCH61_W, SKETCH61_H)
    extrude(amount=-CUT_EXTRUDE26_DEPTH, mode=Mode.SUBTRACT)


with BuildPart() as body_3_7:
    # Sketch51 → Boss-Extrude29 (new body)
    with BuildSketch(Plane(origin=(0, -6.726769048, 6.726769048), x_dir=(1, 0, 0), z_dir=(0, -0.7071067811865475, 0.7071067811865476))):
        with Locations((10.221556697, 8.692844153)):
            Rectangle(SKETCH51_W, SKETCH51_H)
    extrude(amount=BOSS_EXTRUDE29_DEPTH)


with BuildPart() as body_4_3:
    # Sketch51 → Boss-Extrude29 2 (new body)
    with BuildSketch(Plane(origin=(0, -6.726769048, 6.726769048), x_dir=(1, 0, 0), z_dir=(0, -0.7071067811865475, 0.7071067811865476))):
        with Locations((-21.756002911, 8.692844153)):
            Rectangle(SKETCH51_W, SKETCH51_H)
    extrude(amount=BOSS_EXTRUDE29_2_DEPTH)


with BuildPart() as body_5_2:
    # Sketch52 → Boss-Extrude30 (new body)
    with BuildSketch(Plane(origin=(0, 7.726769048, 7.726769048), x_dir=(1, 0, 0), z_dir=(0, 0.7071067811865476, 0.7071067811865475))):
        with Locations((10.221556697, -10.013088019)):
            Rectangle(SKETCH52_W, SKETCH52_H)
    extrude(amount=BOSS_EXTRUDE30_DEPTH)


with BuildPart() as body_6_2:
    # Sketch52 → Boss-Extrude30 2 (new body)
    with BuildSketch(Plane(origin=(0, 7.726769048, 7.726769048), x_dir=(1, 0, 0), z_dir=(0, 0.7071067811865476, 0.7071067811865475))):
        with Locations((-21.756002911, -10.013088019)):
            Rectangle(SKETCH52_W, SKETCH52_H)
    extrude(amount=BOSS_EXTRUDE30_2_DEPTH)


with BuildPart() as body_4_4:
    add(body_4_1.part)

    # Combine8: union body 3 7, body 4 3, body 5 2, body 6 2
    add(body_3_7.part)
    add(body_4_3.part)
    add(body_5_2.part)
    add(body_6_2.part)

    # Sketch53 → Boss-Extrude31 (add)
    with BuildSketch(Plane.XY.offset(11.293538096)):
        with Locations((-21.756002911, -11.82398317)):
            Rectangle(SKETCH53_W, SKETCH53_H)
        with Locations((10.221556697, -11.82398317)):
            Rectangle(SKETCH53_W, SKETCH53_H)
    extrude(amount=BOSS_EXTRUDE31_DEPTH)


with BuildPart() as body_3_8:
    # Boss-Extrude32: read off the stored shape, not the designer's step
    # Boss-Extrude32 outline → Boss-Extrude32 (new body)
    with BuildSketch(Plane.YZ.offset(BOSS_EXTRUDE32_START)):
        Polygon((-11.32398317, 11.293538096), (-2.16, 11.293538096), (-2.867106781, 12.000644877), (-2.574213562, 12.293538096), (-11.32398317, 12.293538096), align=None)
    extrude(amount=BOSS_EXTRUDE32_DEPTH)


with BuildPart() as body_4_4_1:
    # Boss-Extrude32 2 outline → Boss-Extrude32 2 (new body)
    with BuildSketch(Plane.YZ.offset(BOSS_EXTRUDE32_START_2)):
        Polygon((-11.32398317, 11.293538096), (-2.16, 11.293538096), (-2.867106781, 12.000644877), (-2.574213562, 12.293538096), (-11.32398317, 12.293538096), align=None)
    extrude(amount=BOSS_EXTRUDE32_2_DEPTH)


with BuildPart() as body_4_5:
    add(body_4_4.part)

    # Combine9: union body 4 4, body 3 8
    add(body_4_4_1.part)
    add(body_3_8.part)

    # Sketch55 → Boss-Extrude33 (add)
    with BuildSketch(Plane(origin=(0, -11.32398317, 0), x_dir=(1, 0, 0), z_dir=(0, 1, 0))):
        with Locations((10.221556697, -1.004386861)):
            Rectangle(SKETCH55_W, SKETCH55_H)
    extrude(amount=BOSS_EXTRUDE33_DEPTH)

    # Sketch56 → Cut-Extrude25 (cut)
    with BuildSketch(Plane.ZY.offset(-7.421556697)):
        with Locations((0.004386861, -5.661991585)):
            Rectangle(SKETCH56_W, SKETCH56_H)
    extrude(amount=-CUT_EXTRUDE25_DEPTH, mode=Mode.SUBTRACT)


with BuildPart() as cut_extrude28_tool:
    # Sketch62 → Cut-Extrude28 (new body)
    with BuildSketch(Plane(origin=(0, 3, 0), x_dir=(1, 0, 0), z_dir=(0, 1, 0))):
        with Locations((-5.767223107, 30.754931698)):
            Rectangle(SKETCH62_W, SKETCH62_H)
    extrude(amount=-CUT_EXTRUDE28_DEPTH)


with BuildPart() as body_4_6:
    add(body_4_5.part)

    # Cut-Extrude28: cut by cut_extrude28_tool
    add(cut_extrude28_tool.part, mode=Mode.SUBTRACT)

    # Sketch64 → Boss-Extrude35 (add)
    with BuildSketch(Plane(origin=(0, 3, 0), x_dir=(1, 0, 0), z_dir=(0, 1, 0))):
        with Locations((-5.767223107, 5.214512395)):
            Rectangle(SKETCH64_W, SKETCH64_H)
        with Locations((-5.767223107, 56.295351)):
            Rectangle(SKETCH64_W, SKETCH64_H)
    extrude(amount=-BOSS_EXTRUDE35_DEPTH)


with BuildPart() as body_3_6_1:
    add(body_3_6.part)

    # Cut-Extrude28: cut by cut_extrude28_tool
    add(cut_extrude28_tool.part, mode=Mode.SUBTRACT)

    # Sketch65 → Boss-Extrude37 (add)
    with BuildSketch(Plane.XZ):
        with Locations((-5.767223107, -5.214512395)):
            Rectangle(SKETCH65_W, SKETCH65_H)
        with Locations((-5.767223107, -56.295351)):
            Rectangle(SKETCH65_W, SKETCH65_H)
    extrude(amount=-BOSS_EXTRUDE37_DEPTH)


with BuildPart() as cut_extrude31_tool:
    # Sketch67 → Cut-Extrude31 (new body)
    with BuildSketch(Plane.XZ):
        with Locations((-5.767223107, -32.354931697)):
            Rectangle(SKETCH67_W, SKETCH67_H)
    extrude(amount=-CUT_EXTRUDE31_DEPTH)


with BuildPart() as body_4_7:
    add(body_4_6.part)

    # Cut-Extrude31: cut by cut_extrude31_tool
    add(cut_extrude31_tool.part, mode=Mode.SUBTRACT)

    # Sketch71 → Cut-Extrude32 (cut)
    with BuildSketch(Plane(origin=(0, 0, -5.254512395), x_dir=(-1, 0, 0), z_dir=(0, 0, -1))):
        with Locations((5.767223107, 2.5)):
            Rectangle(SKETCH71_W, SKETCH71_H)
    extrude(amount=-CUT_EXTRUDE32_DEPTH, mode=Mode.SUBTRACT)

    # Sketch72 → Boss-Extrude41 (add)
    with BuildSketch(Plane.XY.offset(-56.255351)):
        with Locations((-5.767223107, 2.5)):
            Rectangle(SKETCH72_W, SKETCH72_H)
    extrude(amount=BOSS_EXTRUDE41_DEPTH)

    # Sketch74 → Boss-Extrude43 (add)
    with BuildSketch(Plane(origin=(0, 0, -60.542924633), x_dir=(-1, 0, 0), z_dir=(0, 0, -1))):
        with Locations((5.767223107, 2.5)):
            Rectangle(SKETCH74_W, SKETCH74_H)
    extrude(amount=BOSS_EXTRUDE43_DEPTH)

    # Sketch75 → Boss-Extrude44 (add)
    with BuildSketch(Plane(origin=(0, 3, 0), x_dir=(1, 0, 0), z_dir=(0, 1, 0))):
        with Locations(Location((-5.767223107, -29.250452542, 0), (0, 0, 90))):
            Circle(SKETCH75_R)
    extrude(amount=-BOSS_EXTRUDE44_DEPTH)


with BuildPart() as body_3_6_2:
    add(body_3_6_1.part)

    # Cut-Extrude31: cut by cut_extrude31_tool
    add(cut_extrude31_tool.part, mode=Mode.SUBTRACT)

    # Sketch69 → Boss-Extrude39 (add)
    with BuildSketch(Plane(origin=(0, 0, -1.654512395), x_dir=(-1, 0, 0), z_dir=(0, 0, -1))):
        with Locations((6.105401472, 0.5)):
            Rectangle(SKETCH69_W, SKETCH69_H)
    extrude(amount=-BOSS_EXTRUDE39_DEPTH)

    # Sketch70 → Boss-Extrude40 (add)
    with BuildSketch(Plane.XY.offset(-63.055351)):
        with Locations((-5.767223107, 1)):
            Rectangle(SKETCH70_W, SKETCH70_H)
    extrude(amount=BOSS_EXTRUDE40_DEPTH)

    # Sketch73 → Cut-Extrude33 (cut)
    with BuildSketch(Plane.XY.offset(-62.055351)):
        with Locations((-5.767223107, 1)):
            Rectangle(SKETCH73_W, SKETCH73_H)
    extrude(amount=-CUT_EXTRUDE33_DEPTH, mode=Mode.SUBTRACT)


solid = Compound([body_4_7.part, body_3_6_2.part])
